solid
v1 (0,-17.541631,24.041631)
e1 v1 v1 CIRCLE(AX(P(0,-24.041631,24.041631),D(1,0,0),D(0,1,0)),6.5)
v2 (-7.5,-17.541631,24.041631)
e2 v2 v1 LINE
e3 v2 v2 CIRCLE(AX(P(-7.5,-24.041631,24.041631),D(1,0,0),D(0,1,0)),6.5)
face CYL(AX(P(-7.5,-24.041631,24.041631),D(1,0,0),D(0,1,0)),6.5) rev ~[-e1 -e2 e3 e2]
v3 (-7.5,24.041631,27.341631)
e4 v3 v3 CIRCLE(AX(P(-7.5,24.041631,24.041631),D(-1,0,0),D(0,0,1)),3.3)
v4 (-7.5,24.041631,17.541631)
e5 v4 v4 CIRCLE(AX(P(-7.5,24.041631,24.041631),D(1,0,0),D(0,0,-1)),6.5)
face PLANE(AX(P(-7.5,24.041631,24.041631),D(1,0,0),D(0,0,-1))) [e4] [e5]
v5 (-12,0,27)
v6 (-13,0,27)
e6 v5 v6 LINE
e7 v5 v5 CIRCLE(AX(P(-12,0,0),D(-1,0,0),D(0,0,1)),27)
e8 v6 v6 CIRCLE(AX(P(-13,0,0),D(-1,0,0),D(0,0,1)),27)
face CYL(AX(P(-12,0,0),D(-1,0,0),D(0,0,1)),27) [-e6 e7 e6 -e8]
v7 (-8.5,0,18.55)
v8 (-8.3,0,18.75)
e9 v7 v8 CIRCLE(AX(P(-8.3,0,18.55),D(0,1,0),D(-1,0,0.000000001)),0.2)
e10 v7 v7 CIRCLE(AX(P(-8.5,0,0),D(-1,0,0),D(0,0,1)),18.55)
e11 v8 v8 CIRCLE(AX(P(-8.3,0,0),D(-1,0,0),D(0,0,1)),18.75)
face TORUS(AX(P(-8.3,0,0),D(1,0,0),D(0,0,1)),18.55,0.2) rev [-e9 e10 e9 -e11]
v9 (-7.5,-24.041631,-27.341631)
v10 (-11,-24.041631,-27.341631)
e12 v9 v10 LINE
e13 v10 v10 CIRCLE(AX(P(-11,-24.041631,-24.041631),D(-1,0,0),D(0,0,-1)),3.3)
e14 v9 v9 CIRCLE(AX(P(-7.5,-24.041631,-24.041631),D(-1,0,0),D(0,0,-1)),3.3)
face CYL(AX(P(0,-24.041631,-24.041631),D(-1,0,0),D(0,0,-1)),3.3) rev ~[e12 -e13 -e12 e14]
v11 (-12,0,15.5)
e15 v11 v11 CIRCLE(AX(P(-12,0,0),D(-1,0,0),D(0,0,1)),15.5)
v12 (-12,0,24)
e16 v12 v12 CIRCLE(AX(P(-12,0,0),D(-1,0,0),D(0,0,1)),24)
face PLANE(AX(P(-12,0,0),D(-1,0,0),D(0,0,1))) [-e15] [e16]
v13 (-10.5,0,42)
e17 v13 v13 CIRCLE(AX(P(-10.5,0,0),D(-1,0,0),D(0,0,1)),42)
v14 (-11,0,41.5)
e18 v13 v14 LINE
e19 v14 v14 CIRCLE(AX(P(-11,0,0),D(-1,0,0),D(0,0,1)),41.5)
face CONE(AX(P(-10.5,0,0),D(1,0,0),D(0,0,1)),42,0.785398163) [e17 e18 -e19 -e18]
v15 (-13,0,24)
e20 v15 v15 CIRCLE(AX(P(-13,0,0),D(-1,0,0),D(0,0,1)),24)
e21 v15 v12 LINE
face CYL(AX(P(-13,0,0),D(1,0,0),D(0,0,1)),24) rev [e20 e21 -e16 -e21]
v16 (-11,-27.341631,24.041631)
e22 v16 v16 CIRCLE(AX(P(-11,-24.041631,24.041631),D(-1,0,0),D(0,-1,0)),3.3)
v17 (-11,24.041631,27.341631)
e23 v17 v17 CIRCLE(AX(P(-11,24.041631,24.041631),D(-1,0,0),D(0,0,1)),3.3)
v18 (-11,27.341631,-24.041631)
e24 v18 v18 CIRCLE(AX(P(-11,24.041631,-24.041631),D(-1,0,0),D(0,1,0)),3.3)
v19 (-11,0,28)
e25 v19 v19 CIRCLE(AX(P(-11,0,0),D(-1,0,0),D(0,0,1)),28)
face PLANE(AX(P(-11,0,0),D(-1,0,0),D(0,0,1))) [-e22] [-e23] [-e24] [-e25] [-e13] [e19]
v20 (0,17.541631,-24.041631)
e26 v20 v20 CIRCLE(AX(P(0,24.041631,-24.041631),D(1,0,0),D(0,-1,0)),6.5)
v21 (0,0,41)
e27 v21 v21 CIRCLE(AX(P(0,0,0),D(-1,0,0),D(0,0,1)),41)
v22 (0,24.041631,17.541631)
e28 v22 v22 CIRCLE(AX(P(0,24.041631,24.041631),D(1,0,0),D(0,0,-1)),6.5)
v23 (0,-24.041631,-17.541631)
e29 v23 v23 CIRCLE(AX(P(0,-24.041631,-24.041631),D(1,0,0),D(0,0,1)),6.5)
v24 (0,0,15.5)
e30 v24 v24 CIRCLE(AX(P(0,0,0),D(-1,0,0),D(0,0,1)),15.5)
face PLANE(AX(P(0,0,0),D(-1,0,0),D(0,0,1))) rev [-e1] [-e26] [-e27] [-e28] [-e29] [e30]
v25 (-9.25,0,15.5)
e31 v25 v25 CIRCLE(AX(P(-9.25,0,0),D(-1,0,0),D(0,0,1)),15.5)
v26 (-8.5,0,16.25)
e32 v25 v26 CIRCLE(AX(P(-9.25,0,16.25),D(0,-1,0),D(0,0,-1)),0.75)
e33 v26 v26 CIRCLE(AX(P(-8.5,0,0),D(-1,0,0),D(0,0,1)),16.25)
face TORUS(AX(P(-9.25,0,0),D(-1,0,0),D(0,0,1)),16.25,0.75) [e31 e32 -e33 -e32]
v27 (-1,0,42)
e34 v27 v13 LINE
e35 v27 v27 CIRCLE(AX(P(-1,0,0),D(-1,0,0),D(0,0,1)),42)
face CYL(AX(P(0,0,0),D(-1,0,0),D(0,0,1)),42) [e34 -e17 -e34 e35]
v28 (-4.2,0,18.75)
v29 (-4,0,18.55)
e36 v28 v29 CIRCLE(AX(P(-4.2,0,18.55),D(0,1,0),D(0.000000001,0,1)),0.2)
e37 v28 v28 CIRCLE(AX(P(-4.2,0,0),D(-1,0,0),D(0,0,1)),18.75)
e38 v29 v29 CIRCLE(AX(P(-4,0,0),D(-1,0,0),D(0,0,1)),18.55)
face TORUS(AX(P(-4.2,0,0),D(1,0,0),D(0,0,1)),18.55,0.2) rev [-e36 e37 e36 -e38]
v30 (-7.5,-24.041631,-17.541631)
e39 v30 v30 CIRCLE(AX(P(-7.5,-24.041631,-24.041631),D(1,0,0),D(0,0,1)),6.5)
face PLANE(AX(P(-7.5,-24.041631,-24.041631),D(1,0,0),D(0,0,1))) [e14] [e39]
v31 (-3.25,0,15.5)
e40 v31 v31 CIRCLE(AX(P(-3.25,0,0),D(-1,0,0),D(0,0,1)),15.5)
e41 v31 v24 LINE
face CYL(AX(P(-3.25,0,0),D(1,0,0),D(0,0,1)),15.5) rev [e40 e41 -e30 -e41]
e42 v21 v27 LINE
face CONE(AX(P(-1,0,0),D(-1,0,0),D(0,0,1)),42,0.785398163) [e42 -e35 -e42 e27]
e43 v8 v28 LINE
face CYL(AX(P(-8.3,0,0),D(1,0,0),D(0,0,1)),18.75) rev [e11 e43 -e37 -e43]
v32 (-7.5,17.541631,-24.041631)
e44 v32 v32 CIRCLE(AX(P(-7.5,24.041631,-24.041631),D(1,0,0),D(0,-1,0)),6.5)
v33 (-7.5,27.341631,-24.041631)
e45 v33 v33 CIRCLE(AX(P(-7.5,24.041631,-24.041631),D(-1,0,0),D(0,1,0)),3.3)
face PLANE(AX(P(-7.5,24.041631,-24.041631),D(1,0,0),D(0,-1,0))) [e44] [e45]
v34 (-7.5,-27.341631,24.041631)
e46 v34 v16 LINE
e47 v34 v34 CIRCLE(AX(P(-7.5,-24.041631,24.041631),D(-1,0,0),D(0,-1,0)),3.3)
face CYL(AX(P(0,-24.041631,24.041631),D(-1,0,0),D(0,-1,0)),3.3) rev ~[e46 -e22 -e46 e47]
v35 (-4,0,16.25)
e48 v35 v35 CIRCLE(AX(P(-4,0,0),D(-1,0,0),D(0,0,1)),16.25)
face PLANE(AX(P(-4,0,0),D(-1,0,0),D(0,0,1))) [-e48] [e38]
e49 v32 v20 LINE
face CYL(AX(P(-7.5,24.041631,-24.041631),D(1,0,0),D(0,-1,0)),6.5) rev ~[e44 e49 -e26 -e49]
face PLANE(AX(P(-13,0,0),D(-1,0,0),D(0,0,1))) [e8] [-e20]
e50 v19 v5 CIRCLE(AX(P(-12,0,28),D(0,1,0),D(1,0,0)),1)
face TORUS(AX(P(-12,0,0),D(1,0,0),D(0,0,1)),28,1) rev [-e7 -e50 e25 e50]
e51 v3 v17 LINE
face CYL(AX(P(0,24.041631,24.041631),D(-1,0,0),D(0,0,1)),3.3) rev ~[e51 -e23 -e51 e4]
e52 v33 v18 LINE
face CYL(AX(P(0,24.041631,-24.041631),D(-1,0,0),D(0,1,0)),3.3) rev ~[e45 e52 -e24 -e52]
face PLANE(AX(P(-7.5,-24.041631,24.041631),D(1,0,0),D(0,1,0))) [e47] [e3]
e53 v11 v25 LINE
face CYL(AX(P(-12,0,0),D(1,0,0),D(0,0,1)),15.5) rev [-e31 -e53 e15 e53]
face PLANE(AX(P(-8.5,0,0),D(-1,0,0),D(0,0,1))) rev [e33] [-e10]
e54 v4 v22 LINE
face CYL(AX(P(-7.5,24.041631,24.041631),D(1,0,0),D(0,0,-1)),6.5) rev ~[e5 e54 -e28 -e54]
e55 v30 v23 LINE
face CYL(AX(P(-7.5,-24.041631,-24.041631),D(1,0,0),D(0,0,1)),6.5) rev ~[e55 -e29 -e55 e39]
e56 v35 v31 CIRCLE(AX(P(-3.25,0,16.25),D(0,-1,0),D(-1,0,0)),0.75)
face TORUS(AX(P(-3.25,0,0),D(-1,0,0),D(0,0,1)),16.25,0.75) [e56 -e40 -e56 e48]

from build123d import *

# Parameters (mm, degrees)
F2_SIZE         = 1
F3_SIZE         = 0.5
F5_D            = 6.6
F5_CBORE_D      = 13
F5_CBORE_DEPTH  = 7.5
F5_COPIES_COUNT = 4


# Not quite as in the source:
# - a pattern or mirror of a feature is missing from the dataset's text; its kind, count and spacing are read off the source's solid


with BuildPart() as f1:
    # F0 (on Front) → F1 (revolve)
    with BuildSketch(Plane.XZ):
        with BuildLine():
            Line((-3.25, 15.5), (0, 15.5))
            Line((0, 15.5), (0, 42))
            Line((0, 42), (-11, 42))
            Line((-11, 42), (-11, 28))
            ThreePointArc((-11, 28), (-11.2928932188, 27.2928932188), (-12, 27))
            Line((-12, 27), (-13, 27))
            Line((-13, 27), (-13, 24))
            Line((-13, 24), (-12, 24))
            Line((-12, 24), (-12, 15.5))
            Line((-12, 15.5), (-9.25, 15.5))
            ThreePointArc((-9.25, 15.5), (-8.7196699141, 15.7196699141), (-8.5, 16.25))
            Line((-8.5, 16.25), (-8.5, 18.55))
            ThreePointArc((-8.5, 18.55), (-8.4414213562, 18.6914213562), (-8.3, 18.75))
            Line((-8.3, 18.75), (-4.2, 18.75))
            ThreePointArc((-4.2, 18.75), (-4.0585786438, 18.6914213562), (-4, 18.55))
            Line((-4, 18.55), (-4, 16.25))
            ThreePointArc((-4, 16.25), (-3.7803300859, 15.7196699141), (-3.25, 15.5))
        make_face()
    revolve(axis=Axis((-6.5, 0, 0), (-1, 0, 0)))

    # F2
    f2_edges = [f1.edges().sort_by_distance(p)[0] for p in [
        (0, 0, -42),
    ]]
    chamfer(f2_edges, length=F2_SIZE)

    # F3
    f3_edges = [f1.edges().sort_by_distance(p)[0] for p in [
        (-11, 0, -42),
    ]]
    chamfer(f3_edges, length=F3_SIZE)

    # F5 (through all)
    with Locations(Plane.YZ):
        with Locations((-24.0416305603, 24.0416305603)):
            f5 = CounterBoreHole(F5_D / 2, F5_CBORE_D / 2, F5_CBORE_DEPTH)

    # F5_copies: F5 ×4 about axis
    f5_copies_axis = Axis((0, 0, 0), (1, 0, 0))
    for i in range(1, F5_COPIES_COUNT):
        add(f5.rotate(f5_copies_axis, i * 360 / F5_COPIES_COUNT), mode=Mode.SUBTRACT)


solid = f1.part
